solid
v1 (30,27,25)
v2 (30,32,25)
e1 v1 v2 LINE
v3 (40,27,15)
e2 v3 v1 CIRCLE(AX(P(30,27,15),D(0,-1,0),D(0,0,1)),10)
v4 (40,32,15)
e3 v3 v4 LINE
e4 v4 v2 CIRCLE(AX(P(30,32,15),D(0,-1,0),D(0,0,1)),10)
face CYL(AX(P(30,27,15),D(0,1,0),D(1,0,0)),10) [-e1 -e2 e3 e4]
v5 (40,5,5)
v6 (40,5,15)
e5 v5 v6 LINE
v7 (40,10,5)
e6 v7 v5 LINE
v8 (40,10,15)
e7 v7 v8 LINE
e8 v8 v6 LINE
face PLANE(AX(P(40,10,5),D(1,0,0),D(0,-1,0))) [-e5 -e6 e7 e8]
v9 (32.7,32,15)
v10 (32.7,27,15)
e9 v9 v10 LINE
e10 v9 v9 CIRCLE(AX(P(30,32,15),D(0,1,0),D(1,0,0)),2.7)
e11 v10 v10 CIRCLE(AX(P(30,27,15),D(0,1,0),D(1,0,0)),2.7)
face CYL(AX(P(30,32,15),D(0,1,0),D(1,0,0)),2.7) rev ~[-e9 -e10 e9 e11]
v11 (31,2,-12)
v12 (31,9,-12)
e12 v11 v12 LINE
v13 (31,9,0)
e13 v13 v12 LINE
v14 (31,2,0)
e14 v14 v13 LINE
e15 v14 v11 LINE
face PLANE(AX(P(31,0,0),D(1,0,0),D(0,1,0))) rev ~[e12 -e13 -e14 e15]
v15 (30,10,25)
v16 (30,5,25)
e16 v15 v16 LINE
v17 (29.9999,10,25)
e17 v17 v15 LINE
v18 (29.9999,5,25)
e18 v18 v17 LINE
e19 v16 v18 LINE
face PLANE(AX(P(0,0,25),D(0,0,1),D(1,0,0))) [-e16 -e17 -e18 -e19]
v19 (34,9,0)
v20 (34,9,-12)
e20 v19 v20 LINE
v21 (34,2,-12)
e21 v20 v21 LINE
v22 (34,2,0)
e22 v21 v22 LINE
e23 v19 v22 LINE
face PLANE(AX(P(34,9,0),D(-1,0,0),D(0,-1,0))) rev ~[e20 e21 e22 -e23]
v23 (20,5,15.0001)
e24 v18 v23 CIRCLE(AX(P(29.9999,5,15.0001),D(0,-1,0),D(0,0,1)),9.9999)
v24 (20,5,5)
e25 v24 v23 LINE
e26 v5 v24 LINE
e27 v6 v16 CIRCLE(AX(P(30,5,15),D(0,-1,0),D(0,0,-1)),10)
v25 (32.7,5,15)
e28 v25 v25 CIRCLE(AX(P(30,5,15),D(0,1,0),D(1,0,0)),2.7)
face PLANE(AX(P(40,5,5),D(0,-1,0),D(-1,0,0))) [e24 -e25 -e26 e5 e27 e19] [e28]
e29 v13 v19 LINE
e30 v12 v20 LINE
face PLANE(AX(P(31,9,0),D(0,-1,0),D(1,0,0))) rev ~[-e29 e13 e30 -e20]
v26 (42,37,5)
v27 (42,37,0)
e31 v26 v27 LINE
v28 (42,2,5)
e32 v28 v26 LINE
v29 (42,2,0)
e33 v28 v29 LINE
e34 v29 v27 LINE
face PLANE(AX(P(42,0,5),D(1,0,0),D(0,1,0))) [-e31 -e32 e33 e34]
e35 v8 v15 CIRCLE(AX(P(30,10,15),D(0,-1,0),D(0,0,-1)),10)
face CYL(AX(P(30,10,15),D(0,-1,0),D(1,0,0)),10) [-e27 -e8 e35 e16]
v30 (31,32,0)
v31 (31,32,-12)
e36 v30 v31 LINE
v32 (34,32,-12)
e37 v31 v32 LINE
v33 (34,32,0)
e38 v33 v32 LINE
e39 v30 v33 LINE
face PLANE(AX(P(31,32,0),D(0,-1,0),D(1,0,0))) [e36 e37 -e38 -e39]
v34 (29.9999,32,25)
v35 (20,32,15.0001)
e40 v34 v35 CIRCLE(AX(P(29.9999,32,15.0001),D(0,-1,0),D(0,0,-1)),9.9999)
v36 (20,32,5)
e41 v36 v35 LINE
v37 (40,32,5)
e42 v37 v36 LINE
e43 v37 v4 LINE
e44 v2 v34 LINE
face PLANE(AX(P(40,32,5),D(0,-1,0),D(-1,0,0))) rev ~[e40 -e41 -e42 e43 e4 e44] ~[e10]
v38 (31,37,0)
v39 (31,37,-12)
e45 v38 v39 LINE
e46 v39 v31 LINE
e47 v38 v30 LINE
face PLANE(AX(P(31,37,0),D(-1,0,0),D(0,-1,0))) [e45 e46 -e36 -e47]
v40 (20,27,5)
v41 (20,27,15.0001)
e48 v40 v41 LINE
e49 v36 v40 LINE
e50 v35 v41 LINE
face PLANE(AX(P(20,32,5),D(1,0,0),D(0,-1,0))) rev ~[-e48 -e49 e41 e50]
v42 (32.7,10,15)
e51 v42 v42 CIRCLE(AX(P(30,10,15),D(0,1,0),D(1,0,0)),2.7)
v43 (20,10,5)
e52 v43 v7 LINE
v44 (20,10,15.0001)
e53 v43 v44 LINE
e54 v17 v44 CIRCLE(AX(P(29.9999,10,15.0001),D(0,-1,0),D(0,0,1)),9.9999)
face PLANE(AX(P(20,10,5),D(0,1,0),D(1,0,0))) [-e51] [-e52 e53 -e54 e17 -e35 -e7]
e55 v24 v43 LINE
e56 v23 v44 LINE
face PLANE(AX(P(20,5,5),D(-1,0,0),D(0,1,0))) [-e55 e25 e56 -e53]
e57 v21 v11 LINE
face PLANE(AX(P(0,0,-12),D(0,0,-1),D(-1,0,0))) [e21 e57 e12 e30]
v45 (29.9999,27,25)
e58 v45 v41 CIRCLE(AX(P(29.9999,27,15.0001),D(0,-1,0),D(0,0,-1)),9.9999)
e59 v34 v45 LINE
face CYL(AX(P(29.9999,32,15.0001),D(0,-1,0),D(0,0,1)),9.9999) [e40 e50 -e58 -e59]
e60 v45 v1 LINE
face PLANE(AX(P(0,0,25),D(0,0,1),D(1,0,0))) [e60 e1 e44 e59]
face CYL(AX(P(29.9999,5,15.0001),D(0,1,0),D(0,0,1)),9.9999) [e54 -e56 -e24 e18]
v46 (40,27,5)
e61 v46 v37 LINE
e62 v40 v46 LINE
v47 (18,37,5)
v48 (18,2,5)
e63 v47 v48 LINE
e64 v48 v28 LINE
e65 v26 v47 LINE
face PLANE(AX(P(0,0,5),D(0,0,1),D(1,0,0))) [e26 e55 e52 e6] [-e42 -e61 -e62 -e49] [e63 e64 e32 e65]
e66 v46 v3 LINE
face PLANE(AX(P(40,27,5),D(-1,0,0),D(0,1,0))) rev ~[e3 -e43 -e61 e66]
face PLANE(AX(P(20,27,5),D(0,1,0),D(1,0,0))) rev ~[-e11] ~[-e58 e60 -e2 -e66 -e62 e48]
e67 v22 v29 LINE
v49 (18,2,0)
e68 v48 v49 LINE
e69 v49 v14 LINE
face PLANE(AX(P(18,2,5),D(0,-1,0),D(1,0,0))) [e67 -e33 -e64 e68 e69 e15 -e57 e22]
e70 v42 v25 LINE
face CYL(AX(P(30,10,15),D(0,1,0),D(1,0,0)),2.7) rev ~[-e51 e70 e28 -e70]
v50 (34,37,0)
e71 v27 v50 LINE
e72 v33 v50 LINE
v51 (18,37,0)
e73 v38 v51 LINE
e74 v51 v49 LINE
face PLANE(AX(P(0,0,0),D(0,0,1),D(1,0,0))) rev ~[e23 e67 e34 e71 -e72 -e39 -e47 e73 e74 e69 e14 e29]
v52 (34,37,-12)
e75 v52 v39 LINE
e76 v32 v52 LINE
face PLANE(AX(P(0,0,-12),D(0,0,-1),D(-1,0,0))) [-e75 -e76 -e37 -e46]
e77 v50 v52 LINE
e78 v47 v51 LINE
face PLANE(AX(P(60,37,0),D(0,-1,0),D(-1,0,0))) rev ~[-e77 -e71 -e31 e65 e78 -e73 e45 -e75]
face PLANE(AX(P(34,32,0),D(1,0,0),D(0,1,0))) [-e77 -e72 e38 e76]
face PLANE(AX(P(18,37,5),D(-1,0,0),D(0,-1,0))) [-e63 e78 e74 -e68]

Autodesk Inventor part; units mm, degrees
ref_plane "YZ Plane" through (0, 0, 0) normal (1, 0, 0) x (0, 1, 0)
ref_plane "XZ Plane" through (0, 0, 0) normal (0, 1, 0) x (-1, 0, 0)
ref_plane "XY Plane" through (0, 0, 0) normal (0, 0, 1) x (1, 0, 0)
sketch "Sketch1" plane through (0, 0, 0) normal (0, 0, 1) x (1, 0, 0)
  line L0 (0, 0) -> (60, 0)
  line L1 (60, 0) -> (60, 37)
  line L2 (60, 37) -> (0, 37)
  line L3 (0, 37) -> (0, 0)
  dimension "d0" = 60
  dimension "d1" = 37
extrude "Extrusion1" add sketch "Sketch1" along normal blind 5
sketch "Sketch2" plane through (0, 0, 5) normal (0, 0, 1) x (1, 0, 0)
  line L0 (20, 27) -> (40, 27)
  line L1 (40, 27) -> (40, 32)
  line L2 (40, 32) -> (20, 32)
  line L3 (20, 32) -> (20, 27)
  line L4 (20, 10) -> (40, 10)
  line L5 (40, 10) -> (40, 5)
  line L6 (40, 5) -> (20, 5)
  line L7 (20, 5) -> (20, 10)
  point P0 (0, 0)
  dimension "d6" = 20
  dimension "d7" = 5
  dimension "d8" = 20
  dimension "d9" = 5
extrude "Extrusion2" add sketch "Sketch2" along normal blind 20
sketch "Sketch3" plane through (20, 32, 5) normal (0, 1, 0) x (1, 0, 0)
  circle A0 centre (10, -10) radius 2.7
  point P0 (-20, 5)
  dimension "d12" = 5.4
extrude "Extrusion3" cut sketch "Sketch3" against normal blind 20
sketch "Sketch4" plane through (20, 10, 5) normal (0, 1, 0) x (1, 0, 0)
  circle A0 centre (10, -10) radius 2.7
  point P0 (-20, 5)
  dimension "d15" = 5.4
extrude "Extrusion4" cut sketch "Sketch4" against normal blind 20
fillet "Fillet1" radius 10 1 edges at (40, 29.5, 25)
fillet "Fillet2" radius 10 1 edges at (20, 29.5, 25)
fillet "Fillet3" radius 10 1 edges at (40, 7.5, 25)
fillet "Fillet4" radius 10 1 edges at (20, 7.5, 25)
sketch "Sketch5" plane through (0, 0, 5) normal (0, 0, 1) x (1, 0, 0)
  circle A0 centre (10, 10) radius 2.5
  circle A1 centre (50, 10) radius 2.5
  circle A2 centre (10, 27) radius 2.5
  circle A3 centre (50, 27) radius 2.5
  point P0 (0, 0)
  dimension "d22" = 5
  dimension "d23" = 5
  dimension "d24" = 5
  dimension "d25" = 5
extrude "Extrusion5" cut sketch "Sketch5" against normal blind 20
fillet "Fillet5" radius 10 1 edges at (0, 37, 2.5)
fillet "Fillet6" radius 10 1 edges at (60, 37, 2.5)
fillet "Fillet7" radius 10 1 edges at (60, 0, 2.5)
fillet "Fillet8" radius 10 1 edges at (0, 0, 2.5)
sketch "Sketch6" plane through (0, 0, 0) normal (0, 0, -1) x (-1, 0, 0)
  point P0 (0, 0)
sketch "Sketch7" plane through (0, 0, 5) normal (0, 0, 1) x (1, 0, 0)
  line L0 (10, 0) -> (50, 0) projected
  line L1 (50, 37) -> (10, 37) projected
  line L2 (18, 0) -> (42, 0)
  line L3 (42, 0) -> (42, 37)
  line L4 (42, 37) -> (18, 37)
  line L5 (18, 37) -> (18, 0)
  line L6 (18, 0) -> (0, 0)
  line L7 (0, 0) -> (0, 37)
  line L8 (0, 37) -> (18, 37)
  line L9 (18, 37) -> (18, 0)
  line L10 (42, 0) -> (60, 0)
  line L11 (60, 0) -> (60, 37)
  line L12 (60, 37) -> (42, 37)
  line L13 (42, 37) -> (42, 0)
  dimension "d32" = 24
extrude "Extrusion6" cut sketch "Sketch7" against normal blind 10 contours L6 L7 L8 L1 L5 L0 | L3 L1 L12 L11 L10 L0
sketch "Sketch8" plane through (0, 0, 0) normal (0, 0, -1) x (-1, 0, 0)
  point P0 (0, 0)
sketch "Sketch9" plane through (0, 0, 0) normal (0, 0, -1) x (-1, 0, 0)
  line L0 (-18, 0) -> (-42, 0) projected
  line L1 (-34, 0) -> (-31, 0)
  line L2 (-31, 0) -> (-31, 9)
  line L3 (-31, 9) -> (-34, 9)
  line L4 (-34, 9) -> (-34, 0)
  line L5 (-18, 0) -> (-18, 37) projected
  point P0 (0, 0)
  point P1 (-23, 0)
  point P2 (-37, 0)
  point P3 (-18, 5)
  point P4 (-18, 32)
  dimension "d36" = 3
  dimension "d37" = 9
  dimension "d38" = 16
sketch "Sketch10" plane through (0, 0, 0) normal (0, 0, -1) x (-1, 0, 0)
  line L0 (-42, 37) -> (-18, 37) projected
  line L1 (-34, 37) -> (-31, 37)
  line L2 (-31, 37) -> (-31, 32)
  line L3 (-31, 32) -> (-34, 32)
  line L4 (-34, 32) -> (-34, 37)
  line L5 (-18, 0) -> (-18, 37) projected
  point P0 (0, 0)
  dimension "d39" = 3
  dimension "d40" = 5
  dimension "d41" = 16
sketch "Sketch11" plane through (0, 0, 0) normal (0, 0, -1) x (-1, 0, 0)
  point P0 (0, 0)
sketch "Sketch12" plane through (0, 0, 5) normal (0, 0, 1) x (1, 0, 0)
  point P0 (0, 0)
sketch "Sketch13" plane through (0, 0, 5) normal (0, 0, 1) x (1, 0, 0)
  point P0 (0, 0)
sketch "Sketch14" plane through (0, 0, 5) normal (0, 0, 1) x (1, 0, 0)
  line L0 (42, 0) -> (42, 37) projected
  line L1 (18, 0) -> (18, 37) projected
  line L2 (42, 0) -> (18, 0)
  line L3 (18, 0) -> (18, 2)
  line L4 (18, 2) -> (42, 2)
  line L5 (42, 2) -> (42, 0)
  point P0 (0, 0)
  dimension "d42" = 2
extrude "Extrusion7" add sketch "Sketch10" along normal blind 12
extrude "Extrusion8" add sketch "Sketch9" along normal blind 12
extrude "Extrusion9" cut sketch "Sketch14" against normal blind 22
properties part number "sail_hold_1"
